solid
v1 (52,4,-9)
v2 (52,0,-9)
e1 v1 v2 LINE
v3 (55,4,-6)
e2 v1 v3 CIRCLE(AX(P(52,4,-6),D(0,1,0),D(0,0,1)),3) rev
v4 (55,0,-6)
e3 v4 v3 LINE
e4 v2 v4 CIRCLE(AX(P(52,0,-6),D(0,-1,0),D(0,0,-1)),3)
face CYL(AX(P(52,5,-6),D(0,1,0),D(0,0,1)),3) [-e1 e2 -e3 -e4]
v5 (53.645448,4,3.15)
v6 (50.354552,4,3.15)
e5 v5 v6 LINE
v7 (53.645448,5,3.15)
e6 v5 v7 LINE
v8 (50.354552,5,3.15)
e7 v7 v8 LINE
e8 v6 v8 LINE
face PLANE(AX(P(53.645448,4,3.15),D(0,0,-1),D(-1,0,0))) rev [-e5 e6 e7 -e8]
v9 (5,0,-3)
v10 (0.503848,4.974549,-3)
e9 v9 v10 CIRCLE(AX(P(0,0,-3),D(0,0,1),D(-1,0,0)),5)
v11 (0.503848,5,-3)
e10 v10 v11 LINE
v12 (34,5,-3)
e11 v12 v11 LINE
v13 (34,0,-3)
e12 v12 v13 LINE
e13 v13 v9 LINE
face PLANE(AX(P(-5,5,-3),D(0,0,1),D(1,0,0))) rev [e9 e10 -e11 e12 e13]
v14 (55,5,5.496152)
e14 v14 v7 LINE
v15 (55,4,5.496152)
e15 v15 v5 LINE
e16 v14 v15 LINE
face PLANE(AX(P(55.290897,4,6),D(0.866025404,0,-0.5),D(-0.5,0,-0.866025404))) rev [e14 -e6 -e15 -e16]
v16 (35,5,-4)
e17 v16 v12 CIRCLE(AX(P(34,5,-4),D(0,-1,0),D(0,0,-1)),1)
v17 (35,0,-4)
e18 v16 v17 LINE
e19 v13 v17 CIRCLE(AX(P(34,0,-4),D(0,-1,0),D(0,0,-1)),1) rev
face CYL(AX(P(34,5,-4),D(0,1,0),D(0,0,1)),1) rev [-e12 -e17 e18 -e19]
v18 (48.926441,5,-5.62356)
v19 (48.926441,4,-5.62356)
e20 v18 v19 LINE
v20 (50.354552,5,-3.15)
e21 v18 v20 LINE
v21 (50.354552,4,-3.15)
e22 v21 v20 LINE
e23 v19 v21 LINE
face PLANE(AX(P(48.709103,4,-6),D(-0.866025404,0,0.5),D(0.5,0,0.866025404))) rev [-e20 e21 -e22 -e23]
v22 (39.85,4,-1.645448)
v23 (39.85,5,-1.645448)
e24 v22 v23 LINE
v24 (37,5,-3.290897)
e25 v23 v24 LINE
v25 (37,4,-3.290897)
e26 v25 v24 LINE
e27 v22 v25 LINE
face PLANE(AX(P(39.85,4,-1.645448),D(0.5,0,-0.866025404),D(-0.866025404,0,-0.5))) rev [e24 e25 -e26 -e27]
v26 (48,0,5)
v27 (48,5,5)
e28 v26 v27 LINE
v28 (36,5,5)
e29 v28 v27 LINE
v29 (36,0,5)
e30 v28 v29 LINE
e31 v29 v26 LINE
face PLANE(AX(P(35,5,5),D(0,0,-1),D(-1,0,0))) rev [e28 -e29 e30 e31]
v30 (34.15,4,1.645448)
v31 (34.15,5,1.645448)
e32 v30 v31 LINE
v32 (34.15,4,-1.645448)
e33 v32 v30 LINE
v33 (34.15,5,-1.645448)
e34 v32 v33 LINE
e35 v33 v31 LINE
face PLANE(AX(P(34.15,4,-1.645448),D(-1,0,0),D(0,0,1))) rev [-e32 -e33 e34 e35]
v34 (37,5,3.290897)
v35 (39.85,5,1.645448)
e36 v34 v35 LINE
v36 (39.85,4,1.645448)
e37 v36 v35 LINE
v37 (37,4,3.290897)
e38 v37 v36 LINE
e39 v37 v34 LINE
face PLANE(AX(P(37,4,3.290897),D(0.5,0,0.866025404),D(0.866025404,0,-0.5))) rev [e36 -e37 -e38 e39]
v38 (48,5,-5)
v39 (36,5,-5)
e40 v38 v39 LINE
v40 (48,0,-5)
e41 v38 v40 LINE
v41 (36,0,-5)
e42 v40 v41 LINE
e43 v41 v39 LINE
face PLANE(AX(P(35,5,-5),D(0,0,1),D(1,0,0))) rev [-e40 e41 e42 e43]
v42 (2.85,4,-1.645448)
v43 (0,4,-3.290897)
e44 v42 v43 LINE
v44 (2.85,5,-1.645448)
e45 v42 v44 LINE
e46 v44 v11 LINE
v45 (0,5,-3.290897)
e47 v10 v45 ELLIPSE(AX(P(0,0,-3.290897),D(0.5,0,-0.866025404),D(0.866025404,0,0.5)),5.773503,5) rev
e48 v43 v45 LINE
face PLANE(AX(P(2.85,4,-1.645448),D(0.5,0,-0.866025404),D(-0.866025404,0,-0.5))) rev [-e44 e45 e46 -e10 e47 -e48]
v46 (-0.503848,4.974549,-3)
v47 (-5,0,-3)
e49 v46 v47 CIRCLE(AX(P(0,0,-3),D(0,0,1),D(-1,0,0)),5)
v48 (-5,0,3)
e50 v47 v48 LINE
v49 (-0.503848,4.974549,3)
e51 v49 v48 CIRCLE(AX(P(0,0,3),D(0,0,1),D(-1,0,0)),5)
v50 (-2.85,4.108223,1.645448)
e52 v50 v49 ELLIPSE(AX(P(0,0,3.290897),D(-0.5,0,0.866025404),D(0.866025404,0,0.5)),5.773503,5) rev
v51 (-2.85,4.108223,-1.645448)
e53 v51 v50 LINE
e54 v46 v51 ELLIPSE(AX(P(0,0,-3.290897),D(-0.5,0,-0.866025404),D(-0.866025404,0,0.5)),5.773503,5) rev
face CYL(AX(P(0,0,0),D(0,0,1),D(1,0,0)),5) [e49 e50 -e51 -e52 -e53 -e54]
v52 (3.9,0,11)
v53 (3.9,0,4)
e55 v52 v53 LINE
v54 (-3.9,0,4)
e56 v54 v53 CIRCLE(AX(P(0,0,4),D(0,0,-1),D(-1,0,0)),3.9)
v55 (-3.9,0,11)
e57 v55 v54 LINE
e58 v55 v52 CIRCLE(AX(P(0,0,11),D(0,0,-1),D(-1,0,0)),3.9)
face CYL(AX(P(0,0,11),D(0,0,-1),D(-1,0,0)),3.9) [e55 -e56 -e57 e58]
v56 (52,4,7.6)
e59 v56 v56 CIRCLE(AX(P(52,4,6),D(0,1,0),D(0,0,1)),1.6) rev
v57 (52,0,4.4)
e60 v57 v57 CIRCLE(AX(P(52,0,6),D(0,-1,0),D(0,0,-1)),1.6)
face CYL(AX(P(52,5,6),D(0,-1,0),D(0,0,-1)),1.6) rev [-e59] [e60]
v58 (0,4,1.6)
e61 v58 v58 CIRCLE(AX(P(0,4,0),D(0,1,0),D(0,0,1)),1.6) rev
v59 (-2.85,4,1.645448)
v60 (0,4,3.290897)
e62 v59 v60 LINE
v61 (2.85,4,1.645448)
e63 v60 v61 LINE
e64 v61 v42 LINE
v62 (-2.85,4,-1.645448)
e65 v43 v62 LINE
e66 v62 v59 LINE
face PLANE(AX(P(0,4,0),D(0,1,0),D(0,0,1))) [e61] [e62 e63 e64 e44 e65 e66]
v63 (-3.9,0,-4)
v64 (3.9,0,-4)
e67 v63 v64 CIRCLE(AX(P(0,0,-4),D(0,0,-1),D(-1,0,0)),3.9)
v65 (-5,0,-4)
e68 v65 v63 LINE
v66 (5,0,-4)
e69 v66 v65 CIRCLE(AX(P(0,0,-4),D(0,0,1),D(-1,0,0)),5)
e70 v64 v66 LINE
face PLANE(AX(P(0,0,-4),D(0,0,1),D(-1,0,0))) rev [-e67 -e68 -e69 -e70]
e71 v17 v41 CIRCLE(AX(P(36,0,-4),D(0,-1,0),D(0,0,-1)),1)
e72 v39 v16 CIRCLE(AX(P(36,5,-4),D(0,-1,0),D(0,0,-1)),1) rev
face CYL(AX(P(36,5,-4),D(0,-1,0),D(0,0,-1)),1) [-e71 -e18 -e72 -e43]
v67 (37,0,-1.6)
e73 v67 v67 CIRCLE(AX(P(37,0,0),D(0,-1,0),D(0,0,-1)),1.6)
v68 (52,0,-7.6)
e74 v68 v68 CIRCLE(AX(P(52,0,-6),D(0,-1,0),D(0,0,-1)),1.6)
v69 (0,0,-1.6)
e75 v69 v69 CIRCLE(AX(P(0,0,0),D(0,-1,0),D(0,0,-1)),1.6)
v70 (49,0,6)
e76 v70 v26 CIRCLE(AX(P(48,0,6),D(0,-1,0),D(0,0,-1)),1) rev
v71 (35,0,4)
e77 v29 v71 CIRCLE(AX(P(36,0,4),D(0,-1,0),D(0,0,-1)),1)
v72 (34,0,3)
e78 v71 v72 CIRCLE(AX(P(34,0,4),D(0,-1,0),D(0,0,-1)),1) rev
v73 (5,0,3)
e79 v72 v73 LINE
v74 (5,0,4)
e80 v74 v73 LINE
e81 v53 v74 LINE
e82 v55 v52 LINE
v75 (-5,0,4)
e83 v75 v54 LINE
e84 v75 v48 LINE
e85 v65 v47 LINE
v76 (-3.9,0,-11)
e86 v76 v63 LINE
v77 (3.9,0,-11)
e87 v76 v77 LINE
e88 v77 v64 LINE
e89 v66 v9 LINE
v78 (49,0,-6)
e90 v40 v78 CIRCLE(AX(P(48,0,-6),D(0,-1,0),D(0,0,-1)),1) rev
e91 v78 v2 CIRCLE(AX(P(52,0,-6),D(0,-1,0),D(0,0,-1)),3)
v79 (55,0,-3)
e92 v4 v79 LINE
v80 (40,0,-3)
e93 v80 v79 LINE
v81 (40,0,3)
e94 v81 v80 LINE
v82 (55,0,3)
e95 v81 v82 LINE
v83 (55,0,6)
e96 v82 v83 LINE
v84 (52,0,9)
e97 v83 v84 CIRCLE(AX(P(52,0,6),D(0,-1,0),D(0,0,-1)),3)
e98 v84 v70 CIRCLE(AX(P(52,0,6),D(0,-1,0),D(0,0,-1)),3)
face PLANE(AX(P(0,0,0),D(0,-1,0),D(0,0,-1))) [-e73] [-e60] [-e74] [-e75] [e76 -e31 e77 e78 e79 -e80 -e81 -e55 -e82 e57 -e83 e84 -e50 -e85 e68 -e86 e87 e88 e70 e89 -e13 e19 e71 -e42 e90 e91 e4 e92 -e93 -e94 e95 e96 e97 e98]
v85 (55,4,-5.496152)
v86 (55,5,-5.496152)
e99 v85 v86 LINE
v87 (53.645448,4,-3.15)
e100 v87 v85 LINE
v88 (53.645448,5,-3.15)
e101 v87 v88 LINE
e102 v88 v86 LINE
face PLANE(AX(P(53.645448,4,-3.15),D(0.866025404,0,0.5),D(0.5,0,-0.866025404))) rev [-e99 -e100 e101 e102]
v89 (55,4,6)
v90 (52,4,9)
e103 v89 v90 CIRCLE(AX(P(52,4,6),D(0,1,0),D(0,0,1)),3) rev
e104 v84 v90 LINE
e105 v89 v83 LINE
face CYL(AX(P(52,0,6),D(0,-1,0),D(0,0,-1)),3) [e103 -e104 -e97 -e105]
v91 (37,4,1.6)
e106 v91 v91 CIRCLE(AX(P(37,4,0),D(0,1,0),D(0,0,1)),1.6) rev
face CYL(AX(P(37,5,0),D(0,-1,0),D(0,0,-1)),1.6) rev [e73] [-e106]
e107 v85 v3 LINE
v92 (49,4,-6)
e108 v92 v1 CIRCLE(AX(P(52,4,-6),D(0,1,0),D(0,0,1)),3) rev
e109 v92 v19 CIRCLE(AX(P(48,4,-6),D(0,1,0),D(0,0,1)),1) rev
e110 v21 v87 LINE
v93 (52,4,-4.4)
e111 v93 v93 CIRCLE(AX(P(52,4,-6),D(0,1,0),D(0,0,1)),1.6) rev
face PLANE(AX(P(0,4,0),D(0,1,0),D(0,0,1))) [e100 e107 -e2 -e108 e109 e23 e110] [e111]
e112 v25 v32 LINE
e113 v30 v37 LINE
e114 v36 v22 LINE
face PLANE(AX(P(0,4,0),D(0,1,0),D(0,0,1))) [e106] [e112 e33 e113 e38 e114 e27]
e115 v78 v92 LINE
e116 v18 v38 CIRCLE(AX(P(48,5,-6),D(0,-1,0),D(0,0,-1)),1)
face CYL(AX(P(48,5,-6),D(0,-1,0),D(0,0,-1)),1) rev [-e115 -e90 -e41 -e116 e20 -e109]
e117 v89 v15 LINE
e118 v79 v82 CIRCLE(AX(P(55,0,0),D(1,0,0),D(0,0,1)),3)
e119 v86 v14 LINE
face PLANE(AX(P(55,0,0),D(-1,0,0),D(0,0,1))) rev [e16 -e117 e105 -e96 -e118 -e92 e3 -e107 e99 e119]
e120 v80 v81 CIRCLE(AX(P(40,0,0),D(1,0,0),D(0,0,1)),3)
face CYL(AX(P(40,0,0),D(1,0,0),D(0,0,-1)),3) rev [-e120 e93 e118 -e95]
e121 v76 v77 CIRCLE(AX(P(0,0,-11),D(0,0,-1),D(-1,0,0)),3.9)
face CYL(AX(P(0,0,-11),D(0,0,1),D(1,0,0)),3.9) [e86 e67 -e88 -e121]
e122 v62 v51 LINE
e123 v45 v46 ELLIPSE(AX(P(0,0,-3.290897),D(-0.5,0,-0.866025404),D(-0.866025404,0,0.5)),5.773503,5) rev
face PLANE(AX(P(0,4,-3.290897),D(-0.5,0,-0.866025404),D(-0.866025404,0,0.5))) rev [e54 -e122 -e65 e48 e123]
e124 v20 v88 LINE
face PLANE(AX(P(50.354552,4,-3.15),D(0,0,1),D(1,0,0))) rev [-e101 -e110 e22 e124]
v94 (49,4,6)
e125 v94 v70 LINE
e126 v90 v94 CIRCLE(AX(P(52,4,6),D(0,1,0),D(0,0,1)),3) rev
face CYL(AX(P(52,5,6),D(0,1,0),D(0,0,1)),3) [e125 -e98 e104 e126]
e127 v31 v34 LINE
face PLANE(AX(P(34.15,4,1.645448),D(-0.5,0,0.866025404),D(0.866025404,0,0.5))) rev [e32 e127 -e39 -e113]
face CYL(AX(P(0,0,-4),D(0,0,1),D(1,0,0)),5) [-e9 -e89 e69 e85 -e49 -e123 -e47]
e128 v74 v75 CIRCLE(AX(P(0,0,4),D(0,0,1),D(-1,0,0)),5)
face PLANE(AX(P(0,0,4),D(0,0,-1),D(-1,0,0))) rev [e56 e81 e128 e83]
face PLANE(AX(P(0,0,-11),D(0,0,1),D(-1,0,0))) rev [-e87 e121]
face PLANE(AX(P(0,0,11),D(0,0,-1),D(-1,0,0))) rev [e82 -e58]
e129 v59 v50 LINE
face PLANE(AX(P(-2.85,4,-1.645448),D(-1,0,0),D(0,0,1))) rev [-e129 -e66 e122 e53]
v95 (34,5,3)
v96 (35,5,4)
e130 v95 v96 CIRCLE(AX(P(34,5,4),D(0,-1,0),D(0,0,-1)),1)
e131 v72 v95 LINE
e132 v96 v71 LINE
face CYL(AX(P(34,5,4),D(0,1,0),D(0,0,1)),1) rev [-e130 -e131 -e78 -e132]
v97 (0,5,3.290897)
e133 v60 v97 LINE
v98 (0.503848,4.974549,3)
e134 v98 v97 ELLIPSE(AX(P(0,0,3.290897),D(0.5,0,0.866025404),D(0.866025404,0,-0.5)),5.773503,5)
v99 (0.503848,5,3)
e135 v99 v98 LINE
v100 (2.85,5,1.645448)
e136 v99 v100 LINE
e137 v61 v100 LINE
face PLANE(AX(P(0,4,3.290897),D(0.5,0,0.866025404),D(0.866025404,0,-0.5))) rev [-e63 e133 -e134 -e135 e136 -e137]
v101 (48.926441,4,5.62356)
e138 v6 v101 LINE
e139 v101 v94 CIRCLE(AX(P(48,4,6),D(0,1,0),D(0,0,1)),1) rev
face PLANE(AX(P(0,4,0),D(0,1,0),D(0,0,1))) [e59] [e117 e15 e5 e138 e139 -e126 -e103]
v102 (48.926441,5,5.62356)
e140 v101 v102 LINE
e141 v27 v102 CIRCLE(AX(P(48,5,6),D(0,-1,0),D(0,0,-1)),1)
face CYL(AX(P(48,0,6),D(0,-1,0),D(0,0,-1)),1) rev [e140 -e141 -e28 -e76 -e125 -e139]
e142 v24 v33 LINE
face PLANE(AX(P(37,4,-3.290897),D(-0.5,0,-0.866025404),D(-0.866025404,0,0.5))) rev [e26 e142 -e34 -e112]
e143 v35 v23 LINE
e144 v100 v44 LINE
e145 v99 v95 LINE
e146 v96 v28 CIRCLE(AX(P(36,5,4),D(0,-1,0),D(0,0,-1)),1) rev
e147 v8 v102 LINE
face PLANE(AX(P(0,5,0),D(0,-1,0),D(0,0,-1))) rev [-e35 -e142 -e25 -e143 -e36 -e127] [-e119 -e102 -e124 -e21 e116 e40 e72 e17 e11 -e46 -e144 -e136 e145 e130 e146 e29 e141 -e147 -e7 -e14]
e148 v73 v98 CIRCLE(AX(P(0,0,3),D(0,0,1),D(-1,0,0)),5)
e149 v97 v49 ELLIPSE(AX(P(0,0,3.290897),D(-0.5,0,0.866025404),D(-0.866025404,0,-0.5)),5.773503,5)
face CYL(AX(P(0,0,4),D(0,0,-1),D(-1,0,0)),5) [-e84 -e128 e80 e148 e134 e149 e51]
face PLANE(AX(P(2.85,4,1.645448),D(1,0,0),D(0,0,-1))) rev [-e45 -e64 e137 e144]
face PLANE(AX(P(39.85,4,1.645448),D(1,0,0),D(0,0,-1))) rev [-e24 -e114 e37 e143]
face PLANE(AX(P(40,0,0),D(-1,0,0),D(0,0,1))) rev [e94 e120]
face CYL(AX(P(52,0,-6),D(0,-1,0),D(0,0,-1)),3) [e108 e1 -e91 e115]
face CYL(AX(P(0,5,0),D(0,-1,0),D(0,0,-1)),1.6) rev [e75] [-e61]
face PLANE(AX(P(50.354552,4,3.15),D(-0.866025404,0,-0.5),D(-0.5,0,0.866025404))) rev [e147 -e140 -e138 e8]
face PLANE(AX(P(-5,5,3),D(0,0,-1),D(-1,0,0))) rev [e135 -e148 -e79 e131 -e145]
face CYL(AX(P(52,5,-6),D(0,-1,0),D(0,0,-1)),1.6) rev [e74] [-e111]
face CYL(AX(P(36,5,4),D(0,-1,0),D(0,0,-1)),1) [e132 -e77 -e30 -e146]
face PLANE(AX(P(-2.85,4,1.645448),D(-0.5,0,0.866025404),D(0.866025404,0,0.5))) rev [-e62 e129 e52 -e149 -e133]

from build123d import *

# Parameters (mm, degrees)
SKETCH1_W           = 10
SKETCH1_H           = 6
BOSS_EXTRUDE1_DEPTH = 5
BOSS_EXTRUDE3_DEPTH = 1
BOSS_EXTRUDE4_DEPTH = 7
SKETCH4_W           = 6
SKETCH4_H           = 5
BOSS_EXTRUDE5_DEPTH = 30
SKETCH5_W           = 14
SKETCH5_H           = 10
BOSS_EXTRUDE6_DEPTH = 5
FILLET17_R          = 5
SKETCH8_W           = 18
SKETCH8_H           = 5
BOSS_EXTRUDE7_DEPTH = 6
FILLET8_R           = 1
CUT_EXTRUDE3_DEPTH  = 15
SKETCH10_R          = 1.6
CUT_EXTRUDE4_DEPTH  = 57.311632901
FILLET11_R          = 3
CUT_EXTRUDE9_DEPTH  = 1
SKETCH14_W          = 6
SKETCH14_H          = 5
CUT_EXTRUDE10_DEPTH = 1


with BuildPart() as part:
    # Sketch1 → Boss-Extrude1 (new body)
    with BuildSketch(Plane(origin=(0, 0, 0), x_dir=(1, 0, 0), z_dir=(0, 1, 0))):
        Rectangle(SKETCH1_W, SKETCH1_H)
    extrude(amount=BOSS_EXTRUDE1_DEPTH)

    # Sketch2 → Boss-Extrude3 (add)
    with BuildSketch(Plane.XY.offset(3)):
        with BuildLine():
            Line((-5, 0), (5, 0))
            ThreePointArc((5, 0), (0, 5), (-5, 0))
        make_face()
    boss_extrude3 = extrude(amount=BOSS_EXTRUDE3_DEPTH)

    # Sketch3 → Boss-Extrude4 (add)
    with BuildSketch(Plane.XY.offset(4)):
        with BuildLine():
            Line((-3.9, 0), (3.9, 0))
            ThreePointArc((3.9, 0), (0, 3.9), (-3.9, 0))
        make_face()
    boss_extrude4 = extrude(amount=BOSS_EXTRUDE4_DEPTH)

    # Mirror1: Boss-Extrude3, Boss-Extrude4 across plane
    add(boss_extrude3.mirror(Plane.XY))
    add(boss_extrude4.mirror(Plane.XY))

    # Sketch4 → Boss-Extrude5 (add)
    with BuildSketch(Plane(origin=(5, 0, 0), x_dir=(0, 0, -1), z_dir=(1, 0, 0))):
        with Locations((0, 2.5)):
            Rectangle(SKETCH4_W, SKETCH4_H)
    extrude(amount=BOSS_EXTRUDE5_DEPTH)

    # Sketch5 → Boss-Extrude6 (add)
    with BuildSketch(Plane(origin=(0, 0, 0), x_dir=(1, 0, 0), z_dir=(0, 1, 0))):
        with Locations((42, 0)):
            Rectangle(SKETCH5_W, SKETCH5_H)
    extrude(amount=BOSS_EXTRUDE6_DEPTH)

    # Fillet17
    fillet17_edges = [part.edges().sort_by_distance(p)[0] for p in [
        (-5, 5, 0),
    ]]
    fillet(fillet17_edges, radius=FILLET17_R - 0.0001)  # a hair under: the kernel refuses the full size

    # Sketch8 → Boss-Extrude7 (add)
    with BuildSketch(Plane(origin=(49, 0, 0), x_dir=(0, 0, -1), z_dir=(1, 0, 0))):
        with Locations((0, 2.5)):
            Rectangle(SKETCH8_W, SKETCH8_H)
    extrude(amount=BOSS_EXTRUDE7_DEPTH)

    # Fillet8
    fillet8_edges = [part.edges().sort_by_distance(p)[0] for p in [
        (49, 2.5, 5),
        (35, 2.5, 5),
        (35, 2.5, 3),
        (35, 2.5, -3),
        (35, 2.5, -5),
        (49, 2.5, -5),
    ]]
    fillet(fillet8_edges, radius=FILLET8_R - 0.0001)  # a hair under: the kernel refuses the full size

    # Sketch9 → Cut-Extrude3 (cut)
    with BuildSketch(Plane(origin=(55, 0, 0), x_dir=(0, 0, -1), z_dir=(1, 0, 0))):
        with BuildLine():
            Line((-3, 0), (3, 0))
            ThreePointArc((3, 0), (0, 3), (-3, 0))
        make_face()
    extrude(amount=-CUT_EXTRUDE3_DEPTH, mode=Mode.SUBTRACT)

    # Sketch10 → Cut-Extrude4 (cut, through all)
    with BuildSketch(Plane.XZ):
        with Locations(Location((52, 6, 0), (0, 0, 270))):
            Circle(SKETCH10_R)
        with Locations(Location((52, -6, 0), (0, 0, 270))):
            Circle(SKETCH10_R)
        with Locations(Location((37, 0, 0), (0, 0, 270))):
            Circle(SKETCH10_R)
        with Locations(Location((0, 0, 0), (0, 0, 270))):
            Circle(SKETCH10_R)
    extrude(amount=-CUT_EXTRUDE4_DEPTH, mode=Mode.SUBTRACT)

    # Fillet11
    fillet11_edges = [part.edges().sort_by_distance(p)[0] for p in [
        (49, 2.5, -9),
        (55, 2.5, -9),
        (49, 2.5, 9),
        (55, 2.5, 9),
    ]]
    fillet(fillet11_edges, radius=FILLET11_R - 0.0001)  # a hair under: the kernel refuses the full size

    # Sketch13 → Cut-Extrude9 (cut)
    with BuildSketch(Plane(origin=(0, 5, 0), x_dir=(1, 0, 0), z_dir=(0, 1, 0))):
        Polygon((55.290896534, -6), (53.645448267, -3.15), (50.354551733, -3.15), (48.709103466, -6), (50.354551733, -8.85), (53.645448267, -8.85), align=None)
        Polygon((55.290896534, 6), (53.645448267, 8.85), (50.354551733, 8.85), (48.709103466, 6), (50.354551733, 3.15), (53.645448267, 3.15), align=None)
        Polygon((39.85, -1.645448267), (39.85, 1.645448267), (37, 3.290896534), (34.15, 1.645448267), (34.15, -1.645448267), (37, -3.290896534), align=None)
        Polygon((0, -3.290896534), (2.85, -1.645448267), (2.85, 1.645448267), (0, 3.290896534), (-2.85, 1.645448267), (-2.85, -1.645448267), align=None)
    extrude(amount=-CUT_EXTRUDE9_DEPTH, mode=Mode.SUBTRACT)

    # Sketch14 → Cut-Extrude10 (cut)
    with BuildSketch(Plane(origin=(0, 5, 0), x_dir=(1, 0, 0), z_dir=(0, 1, 0))):
        with Locations((52, -7.996152423)):
            Rectangle(SKETCH14_W, SKETCH14_H)
        with Locations((52, 7.996152423)):
            Rectangle(SKETCH14_W, SKETCH14_H)
    extrude(amount=-CUT_EXTRUDE10_DEPTH, mode=Mode.SUBTRACT)


solid = part.part
